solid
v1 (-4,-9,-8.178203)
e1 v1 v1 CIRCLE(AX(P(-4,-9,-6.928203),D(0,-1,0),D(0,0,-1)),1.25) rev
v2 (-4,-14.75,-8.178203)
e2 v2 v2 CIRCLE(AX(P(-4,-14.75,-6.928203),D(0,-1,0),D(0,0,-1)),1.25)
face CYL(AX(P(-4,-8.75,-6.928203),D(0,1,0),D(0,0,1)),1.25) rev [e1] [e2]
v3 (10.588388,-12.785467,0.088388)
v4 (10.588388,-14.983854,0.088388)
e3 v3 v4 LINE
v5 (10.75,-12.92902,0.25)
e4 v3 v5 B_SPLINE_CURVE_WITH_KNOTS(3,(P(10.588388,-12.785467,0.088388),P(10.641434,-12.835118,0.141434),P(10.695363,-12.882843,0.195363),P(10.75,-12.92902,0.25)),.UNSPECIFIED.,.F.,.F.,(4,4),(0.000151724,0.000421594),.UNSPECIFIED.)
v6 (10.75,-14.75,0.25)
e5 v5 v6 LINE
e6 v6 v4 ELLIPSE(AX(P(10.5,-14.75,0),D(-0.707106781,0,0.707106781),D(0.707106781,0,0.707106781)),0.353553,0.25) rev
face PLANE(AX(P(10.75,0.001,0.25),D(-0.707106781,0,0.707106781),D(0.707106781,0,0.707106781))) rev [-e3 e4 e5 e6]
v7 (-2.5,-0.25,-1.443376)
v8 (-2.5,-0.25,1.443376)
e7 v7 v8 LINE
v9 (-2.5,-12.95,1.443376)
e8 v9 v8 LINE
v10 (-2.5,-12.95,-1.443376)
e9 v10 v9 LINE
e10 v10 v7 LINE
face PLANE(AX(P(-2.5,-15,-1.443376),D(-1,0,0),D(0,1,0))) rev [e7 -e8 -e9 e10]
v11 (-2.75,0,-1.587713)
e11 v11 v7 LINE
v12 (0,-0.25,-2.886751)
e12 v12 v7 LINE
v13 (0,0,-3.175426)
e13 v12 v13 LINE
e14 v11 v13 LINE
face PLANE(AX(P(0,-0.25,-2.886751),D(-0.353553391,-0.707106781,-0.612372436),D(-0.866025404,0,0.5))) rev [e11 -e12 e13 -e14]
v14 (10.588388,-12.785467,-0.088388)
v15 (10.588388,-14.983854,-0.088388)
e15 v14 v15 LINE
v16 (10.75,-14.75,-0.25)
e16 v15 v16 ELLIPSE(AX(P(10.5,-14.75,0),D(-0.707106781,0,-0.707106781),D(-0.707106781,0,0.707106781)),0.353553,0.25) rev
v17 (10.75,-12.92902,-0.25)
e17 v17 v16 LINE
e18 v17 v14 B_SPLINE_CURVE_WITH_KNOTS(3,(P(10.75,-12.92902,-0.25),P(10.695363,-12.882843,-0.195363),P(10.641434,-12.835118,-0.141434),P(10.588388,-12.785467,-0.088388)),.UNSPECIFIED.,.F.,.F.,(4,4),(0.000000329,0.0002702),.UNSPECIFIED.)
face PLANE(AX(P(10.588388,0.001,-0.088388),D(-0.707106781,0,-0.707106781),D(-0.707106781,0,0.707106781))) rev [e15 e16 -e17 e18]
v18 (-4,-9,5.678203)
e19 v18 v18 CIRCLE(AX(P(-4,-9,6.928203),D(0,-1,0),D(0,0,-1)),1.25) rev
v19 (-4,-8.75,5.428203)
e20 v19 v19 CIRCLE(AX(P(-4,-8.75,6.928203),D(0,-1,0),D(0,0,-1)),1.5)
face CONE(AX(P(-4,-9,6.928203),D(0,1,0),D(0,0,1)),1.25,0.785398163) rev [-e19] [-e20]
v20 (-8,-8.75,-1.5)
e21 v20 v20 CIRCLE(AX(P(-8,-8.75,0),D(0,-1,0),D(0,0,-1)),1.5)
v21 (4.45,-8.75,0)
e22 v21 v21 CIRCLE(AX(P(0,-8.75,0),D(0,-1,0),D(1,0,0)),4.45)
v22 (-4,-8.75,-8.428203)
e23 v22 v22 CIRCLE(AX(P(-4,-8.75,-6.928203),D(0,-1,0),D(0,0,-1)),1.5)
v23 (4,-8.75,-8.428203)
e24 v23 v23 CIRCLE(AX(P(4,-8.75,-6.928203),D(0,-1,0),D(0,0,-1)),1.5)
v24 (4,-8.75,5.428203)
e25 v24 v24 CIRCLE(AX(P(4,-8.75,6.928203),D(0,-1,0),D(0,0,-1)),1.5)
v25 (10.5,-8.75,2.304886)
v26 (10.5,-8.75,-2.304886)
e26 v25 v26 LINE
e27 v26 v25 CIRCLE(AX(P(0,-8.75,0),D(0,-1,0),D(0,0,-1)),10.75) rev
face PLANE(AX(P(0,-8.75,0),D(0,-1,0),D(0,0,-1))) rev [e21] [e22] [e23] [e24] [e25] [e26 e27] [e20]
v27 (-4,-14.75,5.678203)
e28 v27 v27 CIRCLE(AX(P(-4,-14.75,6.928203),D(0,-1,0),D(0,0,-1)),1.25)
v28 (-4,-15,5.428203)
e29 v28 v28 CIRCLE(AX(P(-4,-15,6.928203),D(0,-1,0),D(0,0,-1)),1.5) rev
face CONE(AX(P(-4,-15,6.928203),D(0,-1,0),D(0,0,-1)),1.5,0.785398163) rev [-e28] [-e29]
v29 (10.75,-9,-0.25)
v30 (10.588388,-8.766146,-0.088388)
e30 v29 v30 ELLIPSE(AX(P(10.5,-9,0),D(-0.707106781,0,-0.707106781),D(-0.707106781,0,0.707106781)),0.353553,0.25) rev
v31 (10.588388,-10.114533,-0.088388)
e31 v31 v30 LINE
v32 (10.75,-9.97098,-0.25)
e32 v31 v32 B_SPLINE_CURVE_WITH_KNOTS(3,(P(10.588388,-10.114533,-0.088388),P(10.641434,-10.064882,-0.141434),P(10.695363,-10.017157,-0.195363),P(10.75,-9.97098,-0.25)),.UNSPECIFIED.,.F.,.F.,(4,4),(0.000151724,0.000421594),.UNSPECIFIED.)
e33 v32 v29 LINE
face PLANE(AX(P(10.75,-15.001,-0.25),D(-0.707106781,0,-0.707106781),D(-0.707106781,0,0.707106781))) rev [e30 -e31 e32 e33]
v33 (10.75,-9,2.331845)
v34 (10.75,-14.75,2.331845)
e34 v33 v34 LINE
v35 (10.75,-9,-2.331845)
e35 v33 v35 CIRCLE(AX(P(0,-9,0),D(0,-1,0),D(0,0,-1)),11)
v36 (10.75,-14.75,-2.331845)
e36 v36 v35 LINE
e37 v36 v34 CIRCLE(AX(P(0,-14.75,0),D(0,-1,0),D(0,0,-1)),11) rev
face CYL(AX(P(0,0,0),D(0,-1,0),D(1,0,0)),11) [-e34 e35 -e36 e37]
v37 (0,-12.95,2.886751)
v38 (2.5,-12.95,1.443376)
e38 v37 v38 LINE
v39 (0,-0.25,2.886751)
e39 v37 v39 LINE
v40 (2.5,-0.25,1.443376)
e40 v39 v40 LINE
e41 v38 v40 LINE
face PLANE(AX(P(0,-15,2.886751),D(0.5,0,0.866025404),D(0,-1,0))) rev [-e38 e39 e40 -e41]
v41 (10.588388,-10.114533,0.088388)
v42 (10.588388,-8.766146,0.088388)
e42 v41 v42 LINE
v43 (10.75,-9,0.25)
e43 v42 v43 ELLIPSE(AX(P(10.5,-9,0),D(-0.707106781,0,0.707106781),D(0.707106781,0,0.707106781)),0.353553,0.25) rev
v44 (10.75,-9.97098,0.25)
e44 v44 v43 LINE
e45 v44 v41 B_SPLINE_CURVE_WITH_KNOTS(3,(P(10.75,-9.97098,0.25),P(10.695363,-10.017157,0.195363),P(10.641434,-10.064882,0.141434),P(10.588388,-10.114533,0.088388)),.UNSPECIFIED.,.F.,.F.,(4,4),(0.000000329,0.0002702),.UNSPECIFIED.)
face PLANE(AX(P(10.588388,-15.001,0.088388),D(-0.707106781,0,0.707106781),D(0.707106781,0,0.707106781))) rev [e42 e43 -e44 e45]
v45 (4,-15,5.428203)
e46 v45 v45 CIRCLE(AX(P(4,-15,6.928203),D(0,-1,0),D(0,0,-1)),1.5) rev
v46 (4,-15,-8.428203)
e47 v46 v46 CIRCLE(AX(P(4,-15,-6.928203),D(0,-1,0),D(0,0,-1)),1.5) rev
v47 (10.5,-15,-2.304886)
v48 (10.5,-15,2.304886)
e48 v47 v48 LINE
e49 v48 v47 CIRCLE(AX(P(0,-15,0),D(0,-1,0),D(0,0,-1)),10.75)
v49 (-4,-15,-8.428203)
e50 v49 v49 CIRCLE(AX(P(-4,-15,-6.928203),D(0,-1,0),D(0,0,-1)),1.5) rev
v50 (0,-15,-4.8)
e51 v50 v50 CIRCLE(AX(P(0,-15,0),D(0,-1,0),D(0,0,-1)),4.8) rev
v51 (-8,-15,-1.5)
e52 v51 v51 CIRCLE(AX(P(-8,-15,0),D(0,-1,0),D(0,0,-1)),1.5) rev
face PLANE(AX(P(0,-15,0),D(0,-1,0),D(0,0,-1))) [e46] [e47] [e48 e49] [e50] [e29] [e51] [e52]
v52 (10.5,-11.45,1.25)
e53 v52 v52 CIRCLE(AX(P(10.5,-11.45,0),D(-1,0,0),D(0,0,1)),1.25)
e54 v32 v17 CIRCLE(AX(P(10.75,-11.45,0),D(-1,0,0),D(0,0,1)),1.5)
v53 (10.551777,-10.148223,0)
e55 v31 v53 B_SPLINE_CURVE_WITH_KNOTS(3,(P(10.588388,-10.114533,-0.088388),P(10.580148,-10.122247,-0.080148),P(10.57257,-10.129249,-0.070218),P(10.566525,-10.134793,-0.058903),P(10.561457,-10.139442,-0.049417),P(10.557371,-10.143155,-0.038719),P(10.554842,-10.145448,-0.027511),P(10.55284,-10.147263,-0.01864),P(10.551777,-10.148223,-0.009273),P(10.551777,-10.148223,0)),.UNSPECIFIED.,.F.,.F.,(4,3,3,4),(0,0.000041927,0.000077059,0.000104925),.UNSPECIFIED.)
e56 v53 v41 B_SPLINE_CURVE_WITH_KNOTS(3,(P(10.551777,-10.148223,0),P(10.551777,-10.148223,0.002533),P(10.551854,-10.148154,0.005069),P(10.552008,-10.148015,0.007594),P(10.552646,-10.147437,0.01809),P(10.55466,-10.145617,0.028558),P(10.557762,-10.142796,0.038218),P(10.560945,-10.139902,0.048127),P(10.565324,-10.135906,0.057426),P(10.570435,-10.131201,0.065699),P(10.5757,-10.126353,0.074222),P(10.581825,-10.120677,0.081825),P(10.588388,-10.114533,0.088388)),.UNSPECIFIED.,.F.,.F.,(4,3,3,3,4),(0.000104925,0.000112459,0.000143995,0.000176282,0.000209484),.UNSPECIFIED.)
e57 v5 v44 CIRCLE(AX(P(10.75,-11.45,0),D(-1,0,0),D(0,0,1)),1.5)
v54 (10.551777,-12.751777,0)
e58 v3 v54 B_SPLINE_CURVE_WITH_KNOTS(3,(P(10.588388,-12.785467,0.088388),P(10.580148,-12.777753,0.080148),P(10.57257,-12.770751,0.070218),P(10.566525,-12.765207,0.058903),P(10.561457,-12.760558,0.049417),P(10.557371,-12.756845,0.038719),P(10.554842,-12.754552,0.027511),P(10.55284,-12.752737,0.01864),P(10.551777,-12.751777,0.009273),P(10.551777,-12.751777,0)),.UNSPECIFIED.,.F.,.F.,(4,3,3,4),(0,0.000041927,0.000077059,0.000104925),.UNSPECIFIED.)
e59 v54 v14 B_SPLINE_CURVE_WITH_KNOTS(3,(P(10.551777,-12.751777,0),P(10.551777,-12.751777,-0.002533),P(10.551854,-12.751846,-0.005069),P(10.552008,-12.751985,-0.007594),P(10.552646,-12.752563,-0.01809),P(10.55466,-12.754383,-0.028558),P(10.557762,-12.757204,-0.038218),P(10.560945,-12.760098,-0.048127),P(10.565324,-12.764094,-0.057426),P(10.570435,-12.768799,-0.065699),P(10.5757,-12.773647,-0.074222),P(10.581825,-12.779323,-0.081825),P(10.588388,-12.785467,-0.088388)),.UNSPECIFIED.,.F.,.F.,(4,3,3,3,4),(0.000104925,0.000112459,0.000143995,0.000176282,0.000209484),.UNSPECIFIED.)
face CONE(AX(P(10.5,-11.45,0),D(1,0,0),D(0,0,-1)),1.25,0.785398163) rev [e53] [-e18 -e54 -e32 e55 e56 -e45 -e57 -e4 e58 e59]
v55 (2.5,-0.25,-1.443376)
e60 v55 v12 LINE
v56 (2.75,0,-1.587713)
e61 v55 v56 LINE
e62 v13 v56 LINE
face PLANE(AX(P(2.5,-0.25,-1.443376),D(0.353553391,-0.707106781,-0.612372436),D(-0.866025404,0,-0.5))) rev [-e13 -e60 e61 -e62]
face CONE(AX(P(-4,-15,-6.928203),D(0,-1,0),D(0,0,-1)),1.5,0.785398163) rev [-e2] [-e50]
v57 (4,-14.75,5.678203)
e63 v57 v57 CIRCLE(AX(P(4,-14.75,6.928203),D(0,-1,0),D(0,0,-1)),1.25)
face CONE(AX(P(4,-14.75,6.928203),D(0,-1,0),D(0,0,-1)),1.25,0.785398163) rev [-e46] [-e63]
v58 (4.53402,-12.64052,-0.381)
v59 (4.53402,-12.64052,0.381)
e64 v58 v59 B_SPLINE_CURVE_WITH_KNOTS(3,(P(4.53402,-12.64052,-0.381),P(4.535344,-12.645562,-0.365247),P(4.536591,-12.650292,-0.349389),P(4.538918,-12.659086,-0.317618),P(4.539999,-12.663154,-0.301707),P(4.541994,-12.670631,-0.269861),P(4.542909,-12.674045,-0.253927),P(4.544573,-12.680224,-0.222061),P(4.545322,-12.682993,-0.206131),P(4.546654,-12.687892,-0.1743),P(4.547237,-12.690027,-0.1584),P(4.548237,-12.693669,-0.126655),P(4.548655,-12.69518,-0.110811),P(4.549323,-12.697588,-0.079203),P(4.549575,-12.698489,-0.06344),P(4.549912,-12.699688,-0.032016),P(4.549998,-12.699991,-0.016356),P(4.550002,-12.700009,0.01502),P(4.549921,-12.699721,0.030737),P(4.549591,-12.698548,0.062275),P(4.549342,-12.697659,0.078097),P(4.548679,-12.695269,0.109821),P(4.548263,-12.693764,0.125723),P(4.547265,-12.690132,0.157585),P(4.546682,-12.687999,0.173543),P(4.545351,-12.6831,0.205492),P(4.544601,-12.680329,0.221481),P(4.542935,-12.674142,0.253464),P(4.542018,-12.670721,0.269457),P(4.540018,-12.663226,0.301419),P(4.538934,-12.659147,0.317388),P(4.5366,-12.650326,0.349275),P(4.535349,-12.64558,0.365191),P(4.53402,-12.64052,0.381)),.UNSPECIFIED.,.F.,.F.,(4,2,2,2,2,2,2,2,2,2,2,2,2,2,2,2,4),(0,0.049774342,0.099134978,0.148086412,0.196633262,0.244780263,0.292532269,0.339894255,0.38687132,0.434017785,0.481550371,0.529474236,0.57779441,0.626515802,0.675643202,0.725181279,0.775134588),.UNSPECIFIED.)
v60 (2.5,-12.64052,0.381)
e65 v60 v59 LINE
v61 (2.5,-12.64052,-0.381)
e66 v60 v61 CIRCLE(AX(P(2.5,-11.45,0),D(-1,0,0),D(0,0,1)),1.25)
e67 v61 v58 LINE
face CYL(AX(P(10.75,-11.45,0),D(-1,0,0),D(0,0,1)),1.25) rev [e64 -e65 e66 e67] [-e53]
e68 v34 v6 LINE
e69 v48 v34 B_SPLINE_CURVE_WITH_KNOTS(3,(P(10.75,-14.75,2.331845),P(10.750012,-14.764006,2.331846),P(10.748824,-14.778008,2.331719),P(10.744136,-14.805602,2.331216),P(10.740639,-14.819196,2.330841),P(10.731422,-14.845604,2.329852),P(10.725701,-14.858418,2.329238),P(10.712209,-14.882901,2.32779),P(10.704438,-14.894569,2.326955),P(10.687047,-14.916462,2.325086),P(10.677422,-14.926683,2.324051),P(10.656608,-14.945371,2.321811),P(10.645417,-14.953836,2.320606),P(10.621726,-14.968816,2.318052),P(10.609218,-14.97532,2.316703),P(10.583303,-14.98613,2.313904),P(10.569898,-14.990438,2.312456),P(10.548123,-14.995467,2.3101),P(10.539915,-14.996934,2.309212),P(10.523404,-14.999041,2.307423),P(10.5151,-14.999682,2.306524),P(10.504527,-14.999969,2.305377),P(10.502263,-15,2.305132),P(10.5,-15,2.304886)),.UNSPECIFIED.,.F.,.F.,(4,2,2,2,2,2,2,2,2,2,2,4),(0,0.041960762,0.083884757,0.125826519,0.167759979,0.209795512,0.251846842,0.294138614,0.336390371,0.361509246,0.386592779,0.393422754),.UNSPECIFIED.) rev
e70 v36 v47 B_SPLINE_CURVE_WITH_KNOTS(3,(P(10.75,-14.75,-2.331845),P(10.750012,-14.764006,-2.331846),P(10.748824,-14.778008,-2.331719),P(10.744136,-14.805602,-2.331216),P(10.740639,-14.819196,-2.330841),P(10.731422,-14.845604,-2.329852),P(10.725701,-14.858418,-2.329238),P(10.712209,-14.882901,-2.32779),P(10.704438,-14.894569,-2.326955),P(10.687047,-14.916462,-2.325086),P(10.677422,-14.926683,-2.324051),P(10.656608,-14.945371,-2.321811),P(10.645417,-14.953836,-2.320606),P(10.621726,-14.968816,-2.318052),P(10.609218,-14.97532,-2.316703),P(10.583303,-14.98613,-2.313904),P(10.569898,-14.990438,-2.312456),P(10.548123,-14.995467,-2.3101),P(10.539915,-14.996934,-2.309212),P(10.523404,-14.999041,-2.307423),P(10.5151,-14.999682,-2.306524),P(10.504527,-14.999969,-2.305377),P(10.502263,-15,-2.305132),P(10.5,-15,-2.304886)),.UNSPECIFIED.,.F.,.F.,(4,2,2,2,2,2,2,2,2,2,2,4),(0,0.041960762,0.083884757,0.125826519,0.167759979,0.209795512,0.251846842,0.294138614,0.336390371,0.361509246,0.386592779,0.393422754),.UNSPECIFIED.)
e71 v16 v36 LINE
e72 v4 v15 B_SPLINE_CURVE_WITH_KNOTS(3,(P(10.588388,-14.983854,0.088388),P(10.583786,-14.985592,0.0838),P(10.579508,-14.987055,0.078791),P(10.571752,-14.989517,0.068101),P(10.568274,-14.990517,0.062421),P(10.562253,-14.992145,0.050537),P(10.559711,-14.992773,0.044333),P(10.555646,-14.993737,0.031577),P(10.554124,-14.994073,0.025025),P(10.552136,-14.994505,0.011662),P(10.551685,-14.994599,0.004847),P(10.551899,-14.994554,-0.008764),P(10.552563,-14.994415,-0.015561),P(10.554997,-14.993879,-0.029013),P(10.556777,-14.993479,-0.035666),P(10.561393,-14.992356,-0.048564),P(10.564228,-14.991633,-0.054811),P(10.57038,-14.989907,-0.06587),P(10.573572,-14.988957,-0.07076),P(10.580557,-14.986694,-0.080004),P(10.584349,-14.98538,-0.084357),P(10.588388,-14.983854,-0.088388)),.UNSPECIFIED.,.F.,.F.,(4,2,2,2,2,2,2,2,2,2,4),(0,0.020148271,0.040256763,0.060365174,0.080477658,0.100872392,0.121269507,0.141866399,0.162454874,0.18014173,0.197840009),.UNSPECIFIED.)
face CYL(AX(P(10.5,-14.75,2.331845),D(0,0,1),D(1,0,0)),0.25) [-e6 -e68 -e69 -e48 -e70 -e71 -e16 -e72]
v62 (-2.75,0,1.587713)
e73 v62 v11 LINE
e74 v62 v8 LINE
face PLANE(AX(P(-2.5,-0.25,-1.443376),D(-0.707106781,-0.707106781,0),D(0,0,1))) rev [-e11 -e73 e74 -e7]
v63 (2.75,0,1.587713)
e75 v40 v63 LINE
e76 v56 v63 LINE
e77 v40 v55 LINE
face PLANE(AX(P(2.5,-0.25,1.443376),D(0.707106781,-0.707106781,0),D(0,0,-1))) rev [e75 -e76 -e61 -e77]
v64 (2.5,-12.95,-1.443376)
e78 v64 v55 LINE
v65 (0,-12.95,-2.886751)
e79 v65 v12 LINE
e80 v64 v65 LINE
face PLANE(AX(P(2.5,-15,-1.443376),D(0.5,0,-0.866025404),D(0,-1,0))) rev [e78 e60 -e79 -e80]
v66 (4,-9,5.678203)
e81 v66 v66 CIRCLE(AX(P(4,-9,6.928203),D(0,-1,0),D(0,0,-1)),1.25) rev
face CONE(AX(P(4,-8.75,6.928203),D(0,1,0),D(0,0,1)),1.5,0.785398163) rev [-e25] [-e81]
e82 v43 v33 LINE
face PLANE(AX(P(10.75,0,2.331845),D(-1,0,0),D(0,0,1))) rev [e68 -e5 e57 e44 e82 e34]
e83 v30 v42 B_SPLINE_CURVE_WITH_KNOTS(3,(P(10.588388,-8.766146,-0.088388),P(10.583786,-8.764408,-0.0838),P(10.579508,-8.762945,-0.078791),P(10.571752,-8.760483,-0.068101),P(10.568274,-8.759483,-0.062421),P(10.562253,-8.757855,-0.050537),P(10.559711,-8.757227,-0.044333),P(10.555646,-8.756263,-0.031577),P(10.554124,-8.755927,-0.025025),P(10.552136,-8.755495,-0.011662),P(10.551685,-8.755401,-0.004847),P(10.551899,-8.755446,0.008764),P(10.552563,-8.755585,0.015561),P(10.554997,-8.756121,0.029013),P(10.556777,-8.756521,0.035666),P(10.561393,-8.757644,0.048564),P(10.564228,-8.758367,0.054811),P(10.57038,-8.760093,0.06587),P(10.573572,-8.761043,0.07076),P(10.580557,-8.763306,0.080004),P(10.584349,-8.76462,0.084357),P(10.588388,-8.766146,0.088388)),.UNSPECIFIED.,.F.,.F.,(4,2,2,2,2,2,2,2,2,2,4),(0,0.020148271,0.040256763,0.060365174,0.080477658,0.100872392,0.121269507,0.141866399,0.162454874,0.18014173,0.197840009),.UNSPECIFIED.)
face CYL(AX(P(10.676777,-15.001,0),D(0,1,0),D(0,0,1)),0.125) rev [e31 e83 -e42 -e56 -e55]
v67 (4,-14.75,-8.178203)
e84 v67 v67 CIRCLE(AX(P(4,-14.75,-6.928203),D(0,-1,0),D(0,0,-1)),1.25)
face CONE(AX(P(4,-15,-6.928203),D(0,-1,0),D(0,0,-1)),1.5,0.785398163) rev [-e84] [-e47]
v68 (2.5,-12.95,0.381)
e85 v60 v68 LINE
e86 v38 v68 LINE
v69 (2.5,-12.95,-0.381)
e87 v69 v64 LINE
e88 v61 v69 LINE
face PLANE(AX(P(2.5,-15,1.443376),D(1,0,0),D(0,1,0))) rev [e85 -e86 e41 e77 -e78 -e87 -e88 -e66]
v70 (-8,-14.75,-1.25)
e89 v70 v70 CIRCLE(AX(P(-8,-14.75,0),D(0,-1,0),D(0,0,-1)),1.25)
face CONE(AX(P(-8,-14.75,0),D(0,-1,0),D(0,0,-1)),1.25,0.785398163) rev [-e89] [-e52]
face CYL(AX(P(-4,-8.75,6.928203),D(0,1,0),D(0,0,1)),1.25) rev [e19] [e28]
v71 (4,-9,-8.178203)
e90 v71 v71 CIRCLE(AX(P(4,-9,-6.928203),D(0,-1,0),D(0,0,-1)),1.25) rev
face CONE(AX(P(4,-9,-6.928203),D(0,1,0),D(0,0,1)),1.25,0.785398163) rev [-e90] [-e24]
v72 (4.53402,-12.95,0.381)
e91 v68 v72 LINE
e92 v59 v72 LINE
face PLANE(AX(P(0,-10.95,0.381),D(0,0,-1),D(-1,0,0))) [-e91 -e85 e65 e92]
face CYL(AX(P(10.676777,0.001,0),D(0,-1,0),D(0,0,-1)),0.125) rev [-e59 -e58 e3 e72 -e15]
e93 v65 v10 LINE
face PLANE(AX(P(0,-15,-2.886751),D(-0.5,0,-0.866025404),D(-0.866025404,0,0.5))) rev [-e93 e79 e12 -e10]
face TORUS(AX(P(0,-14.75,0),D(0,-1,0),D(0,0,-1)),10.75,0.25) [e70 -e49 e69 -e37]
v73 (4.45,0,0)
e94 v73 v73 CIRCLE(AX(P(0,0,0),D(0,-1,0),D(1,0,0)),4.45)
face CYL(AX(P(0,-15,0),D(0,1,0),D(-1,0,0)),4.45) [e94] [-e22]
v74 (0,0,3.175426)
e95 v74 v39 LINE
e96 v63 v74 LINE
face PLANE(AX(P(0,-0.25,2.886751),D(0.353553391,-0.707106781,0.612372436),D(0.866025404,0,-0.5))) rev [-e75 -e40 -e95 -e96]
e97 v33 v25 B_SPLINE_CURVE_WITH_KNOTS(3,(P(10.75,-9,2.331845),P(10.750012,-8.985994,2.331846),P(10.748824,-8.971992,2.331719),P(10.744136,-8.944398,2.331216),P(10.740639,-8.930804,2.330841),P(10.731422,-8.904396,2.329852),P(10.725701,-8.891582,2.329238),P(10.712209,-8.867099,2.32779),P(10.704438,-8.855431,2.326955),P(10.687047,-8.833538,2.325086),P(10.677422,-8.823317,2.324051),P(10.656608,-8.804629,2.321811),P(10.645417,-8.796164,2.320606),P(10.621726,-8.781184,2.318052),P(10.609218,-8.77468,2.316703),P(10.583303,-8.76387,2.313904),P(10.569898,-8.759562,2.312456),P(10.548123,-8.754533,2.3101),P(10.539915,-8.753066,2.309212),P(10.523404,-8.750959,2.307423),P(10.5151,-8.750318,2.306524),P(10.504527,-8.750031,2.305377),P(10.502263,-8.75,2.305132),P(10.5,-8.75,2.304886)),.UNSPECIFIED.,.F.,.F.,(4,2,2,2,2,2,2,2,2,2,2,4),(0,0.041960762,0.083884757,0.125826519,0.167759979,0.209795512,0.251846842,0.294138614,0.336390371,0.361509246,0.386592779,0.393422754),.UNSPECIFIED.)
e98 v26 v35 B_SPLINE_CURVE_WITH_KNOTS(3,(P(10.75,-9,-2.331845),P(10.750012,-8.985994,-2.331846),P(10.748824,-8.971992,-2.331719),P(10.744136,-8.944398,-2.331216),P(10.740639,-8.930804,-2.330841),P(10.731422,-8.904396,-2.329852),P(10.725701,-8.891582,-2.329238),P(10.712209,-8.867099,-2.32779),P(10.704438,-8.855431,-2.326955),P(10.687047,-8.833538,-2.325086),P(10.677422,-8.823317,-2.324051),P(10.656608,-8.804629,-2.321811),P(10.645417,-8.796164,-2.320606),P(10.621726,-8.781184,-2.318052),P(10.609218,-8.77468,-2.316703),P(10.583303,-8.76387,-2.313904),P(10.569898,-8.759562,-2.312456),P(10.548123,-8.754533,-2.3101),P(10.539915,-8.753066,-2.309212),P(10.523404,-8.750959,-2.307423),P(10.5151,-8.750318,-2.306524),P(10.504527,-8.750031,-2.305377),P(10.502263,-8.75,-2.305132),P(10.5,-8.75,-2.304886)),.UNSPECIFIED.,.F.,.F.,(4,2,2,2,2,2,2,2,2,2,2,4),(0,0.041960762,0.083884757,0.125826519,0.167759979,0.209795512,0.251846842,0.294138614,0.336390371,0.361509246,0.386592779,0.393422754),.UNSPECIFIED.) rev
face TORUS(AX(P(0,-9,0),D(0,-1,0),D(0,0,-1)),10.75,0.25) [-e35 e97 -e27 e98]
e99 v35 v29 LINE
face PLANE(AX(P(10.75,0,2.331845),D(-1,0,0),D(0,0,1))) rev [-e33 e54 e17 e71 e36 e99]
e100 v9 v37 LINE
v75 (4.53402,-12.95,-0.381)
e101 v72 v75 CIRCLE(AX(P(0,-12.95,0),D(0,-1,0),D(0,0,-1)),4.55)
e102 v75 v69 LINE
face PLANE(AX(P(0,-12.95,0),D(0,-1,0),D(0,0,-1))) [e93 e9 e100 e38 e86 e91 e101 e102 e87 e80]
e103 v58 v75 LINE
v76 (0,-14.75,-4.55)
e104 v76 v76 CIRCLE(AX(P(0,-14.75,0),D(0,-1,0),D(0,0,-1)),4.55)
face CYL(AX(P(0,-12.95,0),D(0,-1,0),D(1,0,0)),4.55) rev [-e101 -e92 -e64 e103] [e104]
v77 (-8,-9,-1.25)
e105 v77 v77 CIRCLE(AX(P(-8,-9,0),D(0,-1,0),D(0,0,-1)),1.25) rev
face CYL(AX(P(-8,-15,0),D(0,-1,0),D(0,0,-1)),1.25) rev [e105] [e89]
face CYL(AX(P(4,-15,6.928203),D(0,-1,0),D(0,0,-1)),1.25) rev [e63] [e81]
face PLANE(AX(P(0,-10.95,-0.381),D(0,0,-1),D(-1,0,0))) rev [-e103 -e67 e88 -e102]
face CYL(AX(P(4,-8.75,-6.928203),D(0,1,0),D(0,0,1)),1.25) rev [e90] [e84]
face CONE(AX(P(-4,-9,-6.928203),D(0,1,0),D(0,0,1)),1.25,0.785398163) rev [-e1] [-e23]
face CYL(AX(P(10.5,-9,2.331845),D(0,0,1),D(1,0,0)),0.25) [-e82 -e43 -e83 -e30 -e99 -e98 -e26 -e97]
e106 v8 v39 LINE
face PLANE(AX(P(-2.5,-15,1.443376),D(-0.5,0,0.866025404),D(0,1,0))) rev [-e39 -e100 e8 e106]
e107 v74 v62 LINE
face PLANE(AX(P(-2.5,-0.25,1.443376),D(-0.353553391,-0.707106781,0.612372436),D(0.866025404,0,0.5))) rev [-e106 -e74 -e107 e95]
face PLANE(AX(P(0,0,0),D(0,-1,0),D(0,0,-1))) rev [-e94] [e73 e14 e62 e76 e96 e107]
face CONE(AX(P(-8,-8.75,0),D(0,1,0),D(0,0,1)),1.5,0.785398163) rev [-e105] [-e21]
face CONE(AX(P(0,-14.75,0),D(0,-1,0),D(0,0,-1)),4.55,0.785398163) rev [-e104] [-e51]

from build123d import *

# Parameters (mm, degrees)
CORTE_EXTRUS_O1_START            = -6.25
CORTE_EXTRUS_O1_OUTLINE_R        = 4.55
CORTE_EXTRUS_O1_DEPTH            = 6.25
CORTE_EXTRUS_O1_START_2          = -15
CORTE_EXTRUS_O1_2_OUTLINE_R      = 4.45
CORTE_EXTRUS_O1_2_DEPTH          = 12.640520374
CORTE_EXTRUS_O1_3_DEPTH          = 4.2
CORTE_EXTRUS_O1_4_DEPTH          = 3.890520374
CORTE_EXTRUS_O1_START_3          = 2.5
CORTE_EXTRUS_O1_5_DEPTH          = 3.5
CORTE_EXTRUS_O2_REACH            = 23.61
CORTE_EXTRUS_O3_REACH            = 19.848
FURO_DE_DI_METRO_2_5_2_5_1_D     = 2.5
FURO_DE_DI_METRO_2_5_2_5_1_DEPTH = 15
FURO_DE_DI_METRO_2_5_2_5_2_D     = 2.5
CHANFRO1_SIZE                    = 0.25
FILETE1_R                        = 0.25


with BuildPart() as part:
    # Corte-extrusão1: read off the stored shape, not the designer's step
    # Corte-extrusão1 outline → Corte-extrusão1 (new body)
    with BuildSketch(Plane.XZ.offset(15).offset(CORTE_EXTRUS_O1_START)):
        with BuildLine():
            Line((10.75, -2.331844763), (10.75, 2.331844763))
            ThreePointArc((10.75, 2.331844763), (-11, 0), (10.75, -2.331844763))
        make_face()
        Circle(CORTE_EXTRUS_O1_OUTLINE_R, mode=Mode.SUBTRACT)
    extrude(amount=CORTE_EXTRUS_O1_DEPTH)



with BuildPart() as body_2:
    # Corte-extrus_o1 2 outline → Corte-extrus_o1 2 (new body)
    with BuildSketch(Plane.XZ.offset(15).offset(CORTE_EXTRUS_O1_START_2)):
        Circle(CORTE_EXTRUS_O1_2_OUTLINE_R)
        Polygon((2.5, -1.443375673), (0, -2.886751346), (-2.5, -1.443375673), (-2.5, 1.443375673), (0, 2.886751346), (2.5, 1.443375673), align=None, mode=Mode.SUBTRACT)
    extrude(amount=CORTE_EXTRUS_O1_2_DEPTH)


with BuildPart() as part_1:
    add(part.part)

    add(body_2.part)  # Corte-extrus_o1 3 merges body 2
    # Corte-extrus_o1 3 outline → Corte-extrus_o1 3 (add)
    with BuildSketch(Plane.XZ.offset(15).offset(CORTE_EXTRUS_O1_START)):
        with BuildLine():
            Line((2.5, -0.381), (2.5, -1.443375673))
            Line((2.5, -1.443375673), (0, -2.886751346))
            Line((0, -2.886751346), (-2.5, -1.443375673))
            Line((-2.5, -1.443375673), (-2.5, 1.443375673))
            Line((-2.5, 1.443375673), (0, 2.886751346))
            Line((0, 2.886751346), (2.5, 1.443375673))
            Line((2.5, 1.443375673), (2.5, 0.381))
            Line((2.5, 0.381), (4.534020181, 0.381))
            ThreePointArc((4.534020181, 0.381), (-4.55, 0), (4.534020181, -0.381))
            Line((4.534020181, -0.381), (2.5, -0.381))
        make_face()
    extrude(amount=CORTE_EXTRUS_O1_3_DEPTH)

    # Corte-extrus_o1 4 outline → Corte-extrus_o1 4 (add)
    with BuildSketch(Plane.XZ.offset(15).offset(CORTE_EXTRUS_O1_START)):
        with BuildLine():
            ThreePointArc((4.433659775, 0.381), (4.45, 0), (4.433659775, -0.381))
            Line((4.433659775, -0.381), (4.534020181, -0.381))
            ThreePointArc((4.534020181, -0.381), (4.55, 0), (4.534020181, 0.381))
            Line((4.534020181, 0.381), (4.433659775, 0.381))
        make_face()
    extrude(amount=CORTE_EXTRUS_O1_4_DEPTH)

    # Corte-extrus_o1 5 outline → Corte-extrus_o1 5 (add)
    with BuildSketch(Plane.YZ.offset(CORTE_EXTRUS_O1_START_3)):
        with BuildLine():
            Line((-12.640520474, -0.381), (-12.640520474, 0.381))
            ThreePointArc((-12.640520474, 0.381), (-12.7, 0), (-12.640520474, -0.381))
        make_face()
    extrude(amount=CORTE_EXTRUS_O1_5_DEPTH)

    # Corte-extrusão2: up to this cone (the profile starts outside it)
    corte_extrus_o2_end = Plane(origin=(10.673877, -11.45, 0), z_dir=(1, 0, 0)).offset(-1.423876) * Cone(1e-06, 26.957754, 26.957753, align=(Align.CENTER, Align.CENTER, Align.MIN), mode=Mode.PRIVATE)
    # Esboço2 → Corte-extrusão2 (cut, up to the surface)
    with BuildSketch(Plane.XZ.offset(15), mode=Mode.PRIVATE) as corte_extrus_o2_sk1:
        with BuildLine():
            Line((10.75, -0.25), (10.75, 0.25))
            Line((10.75, 0.25), (10.588388348, 0.088388348))
            ThreePointArc((10.588388348, 0.088388348), (10.551776695, 0), (10.588388348, -0.088388348))
            Line((10.588388348, -0.088388348), (10.75, -0.25))
        make_face()
    corte_extrus_o2_tool1 = extrude(corte_extrus_o2_sk1.sketch, amount=-CORTE_EXTRUS_O2_REACH, mode=Mode.PRIVATE) - corte_extrus_o2_end
    add(corte_extrus_o2_tool1.solids().sort_by_distance((10.673877, -15, 0))[0], mode=Mode.SUBTRACT)

    # Corte-extrusão3: up to this cone (the profile starts outside it)
    corte_extrus_o3_end = Plane(origin=(10.673877, -11.45, 0), z_dir=(1, 0, 0)).offset(-1.423876) * Cone(1e-06, 23.195754, 23.195753, align=(Align.CENTER, Align.CENTER, Align.MIN), mode=Mode.PRIVATE)
    # Esboço3 → Corte-extrusão3 (cut, up to the surface)
    with BuildSketch(Plane(origin=(0, -8.75, 0), x_dir=(-1, 0, 0), z_dir=(0, 1, 0)), mode=Mode.PRIVATE) as corte_extrus_o3_sk1:
        with BuildLine():
            Line((-10.75, 0.25), (-10.75, -0.25))
            Line((-10.75, -0.25), (-10.588388348, -0.088388348))
            ThreePointArc((-10.588388348, -0.088388348), (-10.551776695, 0), (-10.588388348, 0.088388348))
            Line((-10.588388348, 0.088388348), (-10.75, 0.25))
        make_face()
    corte_extrus_o3_tool1 = extrude(corte_extrus_o3_sk1.sketch, amount=-CORTE_EXTRUS_O3_REACH, mode=Mode.PRIVATE) - corte_extrus_o3_end
    add(corte_extrus_o3_tool1.solids().sort_by_distance((10.673877, -8.75, 0))[0], mode=Mode.SUBTRACT)

    # Esboço4 → Corte-Revolução1 (revolve, cut)
    with BuildSketch(Plane(origin=(0, 0, 0), x_dir=(-1, 0, 0), z_dir=(0, 0, -1)), mode=Mode.PRIVATE) as corte_revolu_o1_sk:
        Polygon((-10.75, -9.95), (-10.75, -11.45), (-2.5, -11.45), (-2.5, -10.2), (-10.5, -10.2), align=None)
    revolve(corte_revolu_o1_sk.sketch.rotate(Axis((10.75, -11.45, 0), (-1, 0, 0)), 9.594068227), axis=Axis((10.75, -11.45, 0), (-1, 0, 0)), mode=Mode.SUBTRACT)

    # Furo de diâmetro Ø2.5 (2.5)1
    with Locations(Plane(origin=(0, -15, 0), x_dir=(-1, 0, 0), z_dir=(0, -1, 0))):
        with Locations((-4, -6.92820323), (8, 0)):
            Hole(FURO_DE_DI_METRO_2_5_2_5_1_D / 2, depth=FURO_DE_DI_METRO_2_5_2_5_1_DEPTH)

    # Furo de diâmetro Ø2.5 (2.5)2 (through all)
    with Locations(Plane(origin=(0, -8.75, 0), x_dir=(1, 0, 0), z_dir=(0, 1, 0))):
        with Locations((-4, -6.92820323), (4, 6.92820323), (-4, 6.92820323)):
            Hole(FURO_DE_DI_METRO_2_5_2_5_2_D / 2)

    # Chanfro1
    chanfro1_edges = [part_1.edges().sort_by_distance(p)[0] for p in [
        (1.25, 0, 2.165063509),
        (-1.25, 0, 2.165063509),
        (-2.5, 0, 0),
        (-1.25, 0, -2.165063509),
        (1.25, 0, -2.165063509),
        (2.5, 0, 0),
        (-4.55, -15, 0),
        (-9.25, -8.75, 0),
        (-9.25, -15, 0),
        (2.75, -8.75, 6.92820323),
        (2.75, -15, 6.92820323),
        (-2.75, -8.75, -6.92820323),
        (-2.75, -15, -6.92820323),
        (5.25, -8.75, -6.92820323),
        (5.25, -15, -6.92820323),
        (-2.75, -8.75, 6.92820323),
        (-2.75, -15, 6.92820323),
    ]]
    chamfer(chanfro1_edges, length=CHANFRO1_SIZE)

    # Filete1
    # the kernel refuses this fillet: 0.25 mm, written as the material it takes off along each edge
    with BuildSketch(Plane(origin=(10.75, -8.75, -3.394344763), x_dir=(-1, 0, 0), z_dir=(0, 0, 1)), Plane(origin=(10.75, -15, -0.375), x_dir=(0, 1, 0), z_dir=(0, 0, 1)), Plane(origin=(10.75, -15, -3.394344763), x_dir=(0, 1, 0), z_dir=(0, 0, 1)), Plane(origin=(10.75, -8.75, -0.375), x_dir=(-1, 0, 0), z_dir=(0, 0, 1))) as filete1_piece_1:
        with BuildLine():
            CenterArc((FILETE1_R, FILETE1_R), FILETE1_R, 180, 90)
            Line((0, FILETE1_R), (0, 0))
            Line((0, 0), (FILETE1_R, 0))
        make_face()
    extrude(amount=3.769344763, mode=Mode.SUBTRACT)
    with BuildSketch(Plane(origin=(0, -8.75, 0), x_dir=(0.9877835196921515, 0, 0.15583234011136815), z_dir=(0.15583234011136815, 0, -0.9877835196921515))) as filete1_piece_2:
        with BuildLine():
            CenterArc((11 - FILETE1_R, FILETE1_R), FILETE1_R, 270, 90)
            Line((11, FILETE1_R), (11, 0))
            Line((11, 0), (11 - FILETE1_R, 0))
        make_face()
    revolve(axis=Axis((0, -8.75, 0), (0, -1, 0)), revolution_arc=342.069855141, mode=Mode.SUBTRACT)
    with BuildSketch(Plane(origin=(0, -15, 0), x_dir=(0.9877835196921515, 0, 0.15583234011136815), z_dir=(0.15583234011136815, 0, -0.9877835196921515))) as filete1_piece_3:
        with BuildLine():
            CenterArc((11 - FILETE1_R, -FILETE1_R), FILETE1_R, 0, 90)
            Line((11 - FILETE1_R, 0), (11, 0))
            Line((11, 0), (11, -FILETE1_R))
        make_face()
    revolve(axis=Axis((0, -15, 0), (0, -1, 0)), revolution_arc=342.069855141, mode=Mode.SUBTRACT)


solid = part_1.part
